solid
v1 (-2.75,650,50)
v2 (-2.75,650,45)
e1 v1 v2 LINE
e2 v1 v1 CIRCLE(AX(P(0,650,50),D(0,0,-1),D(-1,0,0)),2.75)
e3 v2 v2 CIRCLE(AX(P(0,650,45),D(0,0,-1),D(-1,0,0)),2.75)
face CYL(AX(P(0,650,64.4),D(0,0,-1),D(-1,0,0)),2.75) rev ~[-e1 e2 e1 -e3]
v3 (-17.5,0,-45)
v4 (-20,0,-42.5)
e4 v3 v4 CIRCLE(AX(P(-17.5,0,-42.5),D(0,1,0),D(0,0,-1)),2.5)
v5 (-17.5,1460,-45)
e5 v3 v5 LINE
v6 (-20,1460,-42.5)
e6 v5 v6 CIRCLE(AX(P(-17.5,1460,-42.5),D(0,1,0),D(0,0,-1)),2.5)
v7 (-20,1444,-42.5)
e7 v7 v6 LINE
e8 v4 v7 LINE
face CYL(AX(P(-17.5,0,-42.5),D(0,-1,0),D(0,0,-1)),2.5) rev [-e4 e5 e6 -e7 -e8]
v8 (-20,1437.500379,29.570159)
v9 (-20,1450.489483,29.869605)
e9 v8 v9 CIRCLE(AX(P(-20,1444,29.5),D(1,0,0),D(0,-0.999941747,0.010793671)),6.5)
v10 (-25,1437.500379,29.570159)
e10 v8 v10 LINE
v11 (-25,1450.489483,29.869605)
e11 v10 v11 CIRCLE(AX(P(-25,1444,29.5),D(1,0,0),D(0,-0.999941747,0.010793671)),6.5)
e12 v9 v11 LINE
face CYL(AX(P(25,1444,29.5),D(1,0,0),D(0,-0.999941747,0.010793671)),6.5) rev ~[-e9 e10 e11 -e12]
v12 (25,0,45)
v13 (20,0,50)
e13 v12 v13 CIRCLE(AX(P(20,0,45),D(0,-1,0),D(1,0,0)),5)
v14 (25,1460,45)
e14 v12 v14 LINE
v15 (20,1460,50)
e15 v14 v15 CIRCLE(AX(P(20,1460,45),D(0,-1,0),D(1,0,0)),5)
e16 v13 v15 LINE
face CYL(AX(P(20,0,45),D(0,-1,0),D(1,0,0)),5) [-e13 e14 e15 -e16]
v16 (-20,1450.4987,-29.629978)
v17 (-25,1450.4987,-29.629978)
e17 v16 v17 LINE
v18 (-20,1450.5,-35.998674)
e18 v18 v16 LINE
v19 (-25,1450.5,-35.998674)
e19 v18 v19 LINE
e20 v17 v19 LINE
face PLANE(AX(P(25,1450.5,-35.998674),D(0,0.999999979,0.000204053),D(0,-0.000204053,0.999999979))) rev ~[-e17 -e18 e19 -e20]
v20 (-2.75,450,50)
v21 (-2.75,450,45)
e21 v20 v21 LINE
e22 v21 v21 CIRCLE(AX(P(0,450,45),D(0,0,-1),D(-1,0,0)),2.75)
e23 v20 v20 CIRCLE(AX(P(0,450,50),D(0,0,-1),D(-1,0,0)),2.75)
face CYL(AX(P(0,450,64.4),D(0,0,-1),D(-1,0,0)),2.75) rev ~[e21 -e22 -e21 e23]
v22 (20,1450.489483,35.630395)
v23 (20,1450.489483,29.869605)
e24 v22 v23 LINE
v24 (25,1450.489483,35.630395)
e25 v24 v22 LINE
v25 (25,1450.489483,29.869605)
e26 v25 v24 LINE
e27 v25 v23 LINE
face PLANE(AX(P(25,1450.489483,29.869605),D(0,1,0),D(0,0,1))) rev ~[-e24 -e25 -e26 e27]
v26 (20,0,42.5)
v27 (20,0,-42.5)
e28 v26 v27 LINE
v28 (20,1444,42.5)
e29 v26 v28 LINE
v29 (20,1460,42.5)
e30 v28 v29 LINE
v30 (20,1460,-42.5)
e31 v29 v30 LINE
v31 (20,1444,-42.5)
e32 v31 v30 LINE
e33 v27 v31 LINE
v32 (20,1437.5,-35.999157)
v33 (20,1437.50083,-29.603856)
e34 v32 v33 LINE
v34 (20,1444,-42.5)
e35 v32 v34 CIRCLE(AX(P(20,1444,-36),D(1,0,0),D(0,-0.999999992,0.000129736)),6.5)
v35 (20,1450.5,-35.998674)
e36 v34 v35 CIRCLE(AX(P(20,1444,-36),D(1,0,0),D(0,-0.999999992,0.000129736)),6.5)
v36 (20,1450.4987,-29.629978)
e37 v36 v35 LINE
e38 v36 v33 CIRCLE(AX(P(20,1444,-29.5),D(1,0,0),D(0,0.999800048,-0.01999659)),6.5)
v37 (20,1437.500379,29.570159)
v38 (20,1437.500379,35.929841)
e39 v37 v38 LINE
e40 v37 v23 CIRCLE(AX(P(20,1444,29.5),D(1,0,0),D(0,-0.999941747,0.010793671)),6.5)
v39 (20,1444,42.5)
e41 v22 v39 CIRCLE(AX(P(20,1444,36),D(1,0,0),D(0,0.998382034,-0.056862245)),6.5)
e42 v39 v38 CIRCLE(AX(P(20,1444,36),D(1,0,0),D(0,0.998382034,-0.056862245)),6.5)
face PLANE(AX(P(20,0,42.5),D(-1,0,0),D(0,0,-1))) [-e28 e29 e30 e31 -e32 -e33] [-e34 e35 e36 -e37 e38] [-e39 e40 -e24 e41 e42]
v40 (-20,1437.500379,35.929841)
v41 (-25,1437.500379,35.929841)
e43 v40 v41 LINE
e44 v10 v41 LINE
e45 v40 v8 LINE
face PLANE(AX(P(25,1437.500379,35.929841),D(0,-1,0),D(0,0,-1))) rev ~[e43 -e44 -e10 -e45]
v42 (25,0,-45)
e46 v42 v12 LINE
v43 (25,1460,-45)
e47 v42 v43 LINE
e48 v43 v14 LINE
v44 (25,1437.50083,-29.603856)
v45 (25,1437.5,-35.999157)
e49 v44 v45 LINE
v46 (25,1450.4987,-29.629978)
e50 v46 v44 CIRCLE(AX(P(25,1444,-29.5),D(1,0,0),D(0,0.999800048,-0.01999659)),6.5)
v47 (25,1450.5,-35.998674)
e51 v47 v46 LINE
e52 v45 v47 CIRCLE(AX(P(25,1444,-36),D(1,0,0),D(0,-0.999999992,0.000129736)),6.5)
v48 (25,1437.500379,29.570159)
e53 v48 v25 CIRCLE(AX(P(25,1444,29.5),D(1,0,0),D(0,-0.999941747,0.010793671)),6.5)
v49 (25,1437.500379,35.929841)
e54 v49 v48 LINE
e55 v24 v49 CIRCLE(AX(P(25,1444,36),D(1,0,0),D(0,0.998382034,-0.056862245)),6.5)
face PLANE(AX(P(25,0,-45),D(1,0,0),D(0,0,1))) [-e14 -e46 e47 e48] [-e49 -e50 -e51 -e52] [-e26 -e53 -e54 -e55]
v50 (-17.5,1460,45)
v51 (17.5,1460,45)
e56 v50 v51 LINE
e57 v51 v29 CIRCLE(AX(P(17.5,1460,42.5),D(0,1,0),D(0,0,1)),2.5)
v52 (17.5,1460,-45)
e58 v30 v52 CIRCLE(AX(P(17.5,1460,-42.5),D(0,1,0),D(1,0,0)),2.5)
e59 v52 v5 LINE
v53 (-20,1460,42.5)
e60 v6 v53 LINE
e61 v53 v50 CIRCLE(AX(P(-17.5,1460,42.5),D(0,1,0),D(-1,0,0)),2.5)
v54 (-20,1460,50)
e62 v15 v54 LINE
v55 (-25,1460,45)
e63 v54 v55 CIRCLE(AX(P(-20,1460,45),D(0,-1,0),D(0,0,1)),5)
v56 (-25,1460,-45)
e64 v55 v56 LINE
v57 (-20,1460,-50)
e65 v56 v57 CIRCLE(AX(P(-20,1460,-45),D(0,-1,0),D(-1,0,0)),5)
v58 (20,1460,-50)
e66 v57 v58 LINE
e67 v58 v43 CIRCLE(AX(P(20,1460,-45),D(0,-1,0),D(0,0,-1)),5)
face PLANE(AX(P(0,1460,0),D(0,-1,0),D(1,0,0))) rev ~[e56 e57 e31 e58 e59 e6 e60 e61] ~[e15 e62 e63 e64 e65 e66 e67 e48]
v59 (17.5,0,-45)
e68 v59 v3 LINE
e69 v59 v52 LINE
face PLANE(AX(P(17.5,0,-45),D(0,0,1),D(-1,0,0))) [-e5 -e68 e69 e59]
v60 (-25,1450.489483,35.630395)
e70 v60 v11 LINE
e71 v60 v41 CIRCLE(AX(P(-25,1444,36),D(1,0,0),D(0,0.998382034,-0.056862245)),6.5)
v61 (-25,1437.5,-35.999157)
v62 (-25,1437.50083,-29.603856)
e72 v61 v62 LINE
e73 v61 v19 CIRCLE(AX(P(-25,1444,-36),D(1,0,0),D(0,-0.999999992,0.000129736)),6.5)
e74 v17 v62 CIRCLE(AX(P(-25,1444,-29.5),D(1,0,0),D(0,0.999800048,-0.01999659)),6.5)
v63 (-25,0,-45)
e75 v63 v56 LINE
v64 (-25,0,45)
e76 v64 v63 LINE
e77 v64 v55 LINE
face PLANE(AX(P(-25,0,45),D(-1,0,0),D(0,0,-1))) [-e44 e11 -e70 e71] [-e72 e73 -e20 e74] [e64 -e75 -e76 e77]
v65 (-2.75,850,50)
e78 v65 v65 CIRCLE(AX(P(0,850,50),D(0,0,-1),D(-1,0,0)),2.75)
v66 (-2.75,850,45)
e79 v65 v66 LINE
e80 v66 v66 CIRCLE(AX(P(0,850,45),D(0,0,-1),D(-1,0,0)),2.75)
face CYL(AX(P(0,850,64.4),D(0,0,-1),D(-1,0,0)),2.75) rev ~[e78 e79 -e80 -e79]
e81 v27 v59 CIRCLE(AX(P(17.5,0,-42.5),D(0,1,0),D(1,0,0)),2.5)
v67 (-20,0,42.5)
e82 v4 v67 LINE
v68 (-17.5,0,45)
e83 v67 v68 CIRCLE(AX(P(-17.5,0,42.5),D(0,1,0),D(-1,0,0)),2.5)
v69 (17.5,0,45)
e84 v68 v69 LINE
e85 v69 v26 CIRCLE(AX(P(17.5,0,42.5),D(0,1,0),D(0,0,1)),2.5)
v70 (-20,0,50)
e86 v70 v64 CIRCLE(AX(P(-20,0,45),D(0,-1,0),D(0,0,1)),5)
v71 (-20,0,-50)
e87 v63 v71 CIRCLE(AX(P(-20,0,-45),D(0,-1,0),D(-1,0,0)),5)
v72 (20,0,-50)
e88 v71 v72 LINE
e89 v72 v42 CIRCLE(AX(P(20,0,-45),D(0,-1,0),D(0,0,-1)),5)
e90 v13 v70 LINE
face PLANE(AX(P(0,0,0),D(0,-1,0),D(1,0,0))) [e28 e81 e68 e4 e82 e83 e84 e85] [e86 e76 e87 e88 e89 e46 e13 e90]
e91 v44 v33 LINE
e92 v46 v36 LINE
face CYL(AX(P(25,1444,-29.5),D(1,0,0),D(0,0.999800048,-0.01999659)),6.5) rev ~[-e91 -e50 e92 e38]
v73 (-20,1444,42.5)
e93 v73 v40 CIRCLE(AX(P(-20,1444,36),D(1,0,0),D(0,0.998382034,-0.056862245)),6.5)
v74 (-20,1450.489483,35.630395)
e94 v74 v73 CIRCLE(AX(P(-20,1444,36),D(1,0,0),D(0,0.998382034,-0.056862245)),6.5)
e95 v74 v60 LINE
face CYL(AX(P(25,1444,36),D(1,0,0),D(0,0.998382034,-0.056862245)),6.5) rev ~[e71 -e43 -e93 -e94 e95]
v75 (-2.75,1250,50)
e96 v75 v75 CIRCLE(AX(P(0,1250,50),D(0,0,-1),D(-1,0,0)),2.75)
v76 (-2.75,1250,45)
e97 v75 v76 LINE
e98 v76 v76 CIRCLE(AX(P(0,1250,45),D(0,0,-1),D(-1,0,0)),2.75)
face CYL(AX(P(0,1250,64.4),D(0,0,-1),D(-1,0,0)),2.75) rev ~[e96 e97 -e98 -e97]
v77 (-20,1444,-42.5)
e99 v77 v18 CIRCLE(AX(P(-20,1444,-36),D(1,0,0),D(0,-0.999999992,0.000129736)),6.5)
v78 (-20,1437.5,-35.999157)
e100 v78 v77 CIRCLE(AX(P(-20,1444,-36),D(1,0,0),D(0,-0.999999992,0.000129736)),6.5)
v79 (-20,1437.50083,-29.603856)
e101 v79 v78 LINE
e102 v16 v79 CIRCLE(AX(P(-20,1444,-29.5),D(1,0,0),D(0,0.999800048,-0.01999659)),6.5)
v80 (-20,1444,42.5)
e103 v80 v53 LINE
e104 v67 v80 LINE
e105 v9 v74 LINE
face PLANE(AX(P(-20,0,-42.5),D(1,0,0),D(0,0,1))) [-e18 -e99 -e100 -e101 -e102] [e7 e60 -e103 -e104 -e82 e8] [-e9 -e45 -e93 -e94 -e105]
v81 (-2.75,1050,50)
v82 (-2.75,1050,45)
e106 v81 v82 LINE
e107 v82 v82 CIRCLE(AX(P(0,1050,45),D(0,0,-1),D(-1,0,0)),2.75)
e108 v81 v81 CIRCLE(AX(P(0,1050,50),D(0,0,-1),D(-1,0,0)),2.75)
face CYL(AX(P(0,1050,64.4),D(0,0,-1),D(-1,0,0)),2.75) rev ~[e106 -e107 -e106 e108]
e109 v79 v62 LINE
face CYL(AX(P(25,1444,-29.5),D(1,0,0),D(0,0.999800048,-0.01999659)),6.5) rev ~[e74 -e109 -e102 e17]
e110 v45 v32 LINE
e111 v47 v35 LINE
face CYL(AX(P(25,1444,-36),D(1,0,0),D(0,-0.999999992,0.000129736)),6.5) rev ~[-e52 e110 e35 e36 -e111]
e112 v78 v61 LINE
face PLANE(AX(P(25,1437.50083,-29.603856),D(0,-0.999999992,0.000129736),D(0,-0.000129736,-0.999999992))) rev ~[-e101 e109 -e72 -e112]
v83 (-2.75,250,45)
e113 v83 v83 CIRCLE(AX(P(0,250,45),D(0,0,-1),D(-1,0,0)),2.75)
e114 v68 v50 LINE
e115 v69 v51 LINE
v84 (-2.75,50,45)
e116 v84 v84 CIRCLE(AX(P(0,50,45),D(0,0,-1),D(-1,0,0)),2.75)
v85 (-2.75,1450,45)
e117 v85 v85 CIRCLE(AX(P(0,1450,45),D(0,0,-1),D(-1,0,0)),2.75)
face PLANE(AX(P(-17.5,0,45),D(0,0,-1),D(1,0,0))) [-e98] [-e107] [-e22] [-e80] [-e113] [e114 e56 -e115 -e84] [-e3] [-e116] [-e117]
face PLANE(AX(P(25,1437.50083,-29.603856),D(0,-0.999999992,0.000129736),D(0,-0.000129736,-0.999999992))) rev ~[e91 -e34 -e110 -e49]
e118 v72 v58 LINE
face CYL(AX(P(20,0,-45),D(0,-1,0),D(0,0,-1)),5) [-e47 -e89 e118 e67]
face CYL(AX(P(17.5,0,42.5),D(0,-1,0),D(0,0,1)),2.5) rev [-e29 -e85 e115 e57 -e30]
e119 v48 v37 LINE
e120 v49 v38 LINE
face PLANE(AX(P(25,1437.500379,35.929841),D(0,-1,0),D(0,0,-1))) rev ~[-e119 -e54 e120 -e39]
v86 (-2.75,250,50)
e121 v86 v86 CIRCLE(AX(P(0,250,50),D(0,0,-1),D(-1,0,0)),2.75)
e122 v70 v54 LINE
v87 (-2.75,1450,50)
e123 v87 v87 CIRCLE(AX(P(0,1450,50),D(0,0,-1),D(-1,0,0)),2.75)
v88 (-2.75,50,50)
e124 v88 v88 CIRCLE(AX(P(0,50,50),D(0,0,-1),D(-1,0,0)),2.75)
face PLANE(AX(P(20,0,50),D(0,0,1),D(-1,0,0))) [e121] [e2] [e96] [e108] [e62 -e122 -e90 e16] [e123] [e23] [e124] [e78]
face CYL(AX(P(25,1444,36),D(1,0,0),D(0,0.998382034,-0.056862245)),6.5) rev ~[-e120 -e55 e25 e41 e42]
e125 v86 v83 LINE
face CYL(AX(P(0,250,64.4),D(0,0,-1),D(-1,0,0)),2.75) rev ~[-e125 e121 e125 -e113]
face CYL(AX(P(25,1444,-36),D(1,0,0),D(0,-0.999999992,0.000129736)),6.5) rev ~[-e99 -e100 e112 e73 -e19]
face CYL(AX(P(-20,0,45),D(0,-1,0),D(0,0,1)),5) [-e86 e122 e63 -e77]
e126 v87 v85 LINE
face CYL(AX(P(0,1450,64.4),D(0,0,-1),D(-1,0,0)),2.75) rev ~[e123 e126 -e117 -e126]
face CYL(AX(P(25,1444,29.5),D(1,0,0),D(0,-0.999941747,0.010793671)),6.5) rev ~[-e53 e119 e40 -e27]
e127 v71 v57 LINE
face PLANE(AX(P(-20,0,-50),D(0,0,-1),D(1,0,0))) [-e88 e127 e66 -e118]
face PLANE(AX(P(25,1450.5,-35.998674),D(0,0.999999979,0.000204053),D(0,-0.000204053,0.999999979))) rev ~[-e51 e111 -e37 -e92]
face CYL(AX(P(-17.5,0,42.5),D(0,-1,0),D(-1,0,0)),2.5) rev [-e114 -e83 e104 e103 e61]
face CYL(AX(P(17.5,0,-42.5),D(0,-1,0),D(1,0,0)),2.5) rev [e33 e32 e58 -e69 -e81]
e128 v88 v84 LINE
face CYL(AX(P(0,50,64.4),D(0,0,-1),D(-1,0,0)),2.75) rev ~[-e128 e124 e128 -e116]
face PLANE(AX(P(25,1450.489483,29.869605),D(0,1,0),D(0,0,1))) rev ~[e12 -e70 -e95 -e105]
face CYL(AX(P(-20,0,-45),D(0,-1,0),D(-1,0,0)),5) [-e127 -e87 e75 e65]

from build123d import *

# Parameters (mm, degrees)
F1_DEPTH = 1460
F3_D     = 5.5
F3_DEPTH = 14.4
F3_TIP   = 1.6523667023
F5_DEPTH = 50.001


# Not quite as in the source:
# - a feature names something its author has since deleted; it is built from what else it names


with BuildPart() as f1:
    # F0 (on Front) → F1 (new body)
    with BuildSketch(Plane.XZ):
        with BuildLine():
            Line((-20, -50), (20, -50))
            ThreePointArc((20, -50), (23.5355339059, -48.5355339059), (25, -45))
            Line((25, -45), (25, 45))
            ThreePointArc((25, 45), (23.5355339059, 48.5355339059), (20, 50))
            Line((20, 50), (-20, 50))
            ThreePointArc((-20, 50), (-23.5355339059, 48.5355339059), (-25, 45))
            Line((-25, 45), (-25, -45))
            ThreePointArc((-25, -45), (-23.5355339059, -48.5355339059), (-20, -50))
        make_face()
        with BuildLine():
            ThreePointArc((-17.5, -45), (-19.267766953, -44.267766953), (-20, -42.5))
            Line((-20, -42.5), (-20, 42.5))
            ThreePointArc((-20, 42.5), (-19.267766953, 44.267766953), (-17.5, 45))
            Line((-17.5, 45), (17.5, 45))
            ThreePointArc((17.5, 45), (19.267766953, 44.267766953), (20, 42.5))
            Line((20, 42.5), (20, -42.5))
            ThreePointArc((20, -42.5), (19.267766953, -44.267766953), (17.5, -45))
            Line((17.5, -45), (-17.5, -45))
        make_face(mode=Mode.SUBTRACT)
    extrude(amount=-F1_DEPTH)

    # F3
    with Locations(Plane.XY.offset(50)):
        with Locations((0, 50), (0, 250), (0, 450), (0, 650), (0, 850), (0, 1050), (0, 1250), (0, 1450)):
            Hole(F3_D / 2, depth=F3_DEPTH)
            with Locations((0, 0, -(F3_DEPTH + F3_TIP / 2))):  # 118° drill point
                Cone(0, F3_D / 2, F3_TIP, mode=Mode.SUBTRACT)

    # F4 (on face) → F5 (cut, through all)
    with BuildSketch(Plane.YZ.offset(25)):
        with BuildLine():
            Line((1450.4894832185, 29.8696045958), (1450.4894832185, 35.6303954042))
            ThreePointArc((1450.4894832185, 35.6303954042), (1444.1498086534, 42.4982734143), (1437.5003786468, 35.9298411402))
            Line((1437.5003786468, 35.9298411402), (1437.5003786468, 29.5701588598))
            ThreePointArc((1437.5003786468, 29.5701588598), (1444.1498086534, 23.0017265857), (1450.4894832185, 29.8696045958))
        make_face()
        with BuildLine():
            Line((1437.5008297564, -29.6038563662), (1437.5000000547, -35.999156715))
            ThreePointArc((1437.5000000547, -35.999156715), (1444.0002415297, -42.4999999955), (1450.4999998647, -35.9986736556))
            Line((1450.4999998647, -35.9986736556), (1450.4987003133, -29.6299778371))
            ThreePointArc((1450.4987003133, -29.6299778371), (1444.0130628488, -23.000013126), (1437.5008297564, -29.6038563662))
        make_face()
    extrude(amount=-F5_DEPTH, mode=Mode.SUBTRACT)


solid = f1.part
